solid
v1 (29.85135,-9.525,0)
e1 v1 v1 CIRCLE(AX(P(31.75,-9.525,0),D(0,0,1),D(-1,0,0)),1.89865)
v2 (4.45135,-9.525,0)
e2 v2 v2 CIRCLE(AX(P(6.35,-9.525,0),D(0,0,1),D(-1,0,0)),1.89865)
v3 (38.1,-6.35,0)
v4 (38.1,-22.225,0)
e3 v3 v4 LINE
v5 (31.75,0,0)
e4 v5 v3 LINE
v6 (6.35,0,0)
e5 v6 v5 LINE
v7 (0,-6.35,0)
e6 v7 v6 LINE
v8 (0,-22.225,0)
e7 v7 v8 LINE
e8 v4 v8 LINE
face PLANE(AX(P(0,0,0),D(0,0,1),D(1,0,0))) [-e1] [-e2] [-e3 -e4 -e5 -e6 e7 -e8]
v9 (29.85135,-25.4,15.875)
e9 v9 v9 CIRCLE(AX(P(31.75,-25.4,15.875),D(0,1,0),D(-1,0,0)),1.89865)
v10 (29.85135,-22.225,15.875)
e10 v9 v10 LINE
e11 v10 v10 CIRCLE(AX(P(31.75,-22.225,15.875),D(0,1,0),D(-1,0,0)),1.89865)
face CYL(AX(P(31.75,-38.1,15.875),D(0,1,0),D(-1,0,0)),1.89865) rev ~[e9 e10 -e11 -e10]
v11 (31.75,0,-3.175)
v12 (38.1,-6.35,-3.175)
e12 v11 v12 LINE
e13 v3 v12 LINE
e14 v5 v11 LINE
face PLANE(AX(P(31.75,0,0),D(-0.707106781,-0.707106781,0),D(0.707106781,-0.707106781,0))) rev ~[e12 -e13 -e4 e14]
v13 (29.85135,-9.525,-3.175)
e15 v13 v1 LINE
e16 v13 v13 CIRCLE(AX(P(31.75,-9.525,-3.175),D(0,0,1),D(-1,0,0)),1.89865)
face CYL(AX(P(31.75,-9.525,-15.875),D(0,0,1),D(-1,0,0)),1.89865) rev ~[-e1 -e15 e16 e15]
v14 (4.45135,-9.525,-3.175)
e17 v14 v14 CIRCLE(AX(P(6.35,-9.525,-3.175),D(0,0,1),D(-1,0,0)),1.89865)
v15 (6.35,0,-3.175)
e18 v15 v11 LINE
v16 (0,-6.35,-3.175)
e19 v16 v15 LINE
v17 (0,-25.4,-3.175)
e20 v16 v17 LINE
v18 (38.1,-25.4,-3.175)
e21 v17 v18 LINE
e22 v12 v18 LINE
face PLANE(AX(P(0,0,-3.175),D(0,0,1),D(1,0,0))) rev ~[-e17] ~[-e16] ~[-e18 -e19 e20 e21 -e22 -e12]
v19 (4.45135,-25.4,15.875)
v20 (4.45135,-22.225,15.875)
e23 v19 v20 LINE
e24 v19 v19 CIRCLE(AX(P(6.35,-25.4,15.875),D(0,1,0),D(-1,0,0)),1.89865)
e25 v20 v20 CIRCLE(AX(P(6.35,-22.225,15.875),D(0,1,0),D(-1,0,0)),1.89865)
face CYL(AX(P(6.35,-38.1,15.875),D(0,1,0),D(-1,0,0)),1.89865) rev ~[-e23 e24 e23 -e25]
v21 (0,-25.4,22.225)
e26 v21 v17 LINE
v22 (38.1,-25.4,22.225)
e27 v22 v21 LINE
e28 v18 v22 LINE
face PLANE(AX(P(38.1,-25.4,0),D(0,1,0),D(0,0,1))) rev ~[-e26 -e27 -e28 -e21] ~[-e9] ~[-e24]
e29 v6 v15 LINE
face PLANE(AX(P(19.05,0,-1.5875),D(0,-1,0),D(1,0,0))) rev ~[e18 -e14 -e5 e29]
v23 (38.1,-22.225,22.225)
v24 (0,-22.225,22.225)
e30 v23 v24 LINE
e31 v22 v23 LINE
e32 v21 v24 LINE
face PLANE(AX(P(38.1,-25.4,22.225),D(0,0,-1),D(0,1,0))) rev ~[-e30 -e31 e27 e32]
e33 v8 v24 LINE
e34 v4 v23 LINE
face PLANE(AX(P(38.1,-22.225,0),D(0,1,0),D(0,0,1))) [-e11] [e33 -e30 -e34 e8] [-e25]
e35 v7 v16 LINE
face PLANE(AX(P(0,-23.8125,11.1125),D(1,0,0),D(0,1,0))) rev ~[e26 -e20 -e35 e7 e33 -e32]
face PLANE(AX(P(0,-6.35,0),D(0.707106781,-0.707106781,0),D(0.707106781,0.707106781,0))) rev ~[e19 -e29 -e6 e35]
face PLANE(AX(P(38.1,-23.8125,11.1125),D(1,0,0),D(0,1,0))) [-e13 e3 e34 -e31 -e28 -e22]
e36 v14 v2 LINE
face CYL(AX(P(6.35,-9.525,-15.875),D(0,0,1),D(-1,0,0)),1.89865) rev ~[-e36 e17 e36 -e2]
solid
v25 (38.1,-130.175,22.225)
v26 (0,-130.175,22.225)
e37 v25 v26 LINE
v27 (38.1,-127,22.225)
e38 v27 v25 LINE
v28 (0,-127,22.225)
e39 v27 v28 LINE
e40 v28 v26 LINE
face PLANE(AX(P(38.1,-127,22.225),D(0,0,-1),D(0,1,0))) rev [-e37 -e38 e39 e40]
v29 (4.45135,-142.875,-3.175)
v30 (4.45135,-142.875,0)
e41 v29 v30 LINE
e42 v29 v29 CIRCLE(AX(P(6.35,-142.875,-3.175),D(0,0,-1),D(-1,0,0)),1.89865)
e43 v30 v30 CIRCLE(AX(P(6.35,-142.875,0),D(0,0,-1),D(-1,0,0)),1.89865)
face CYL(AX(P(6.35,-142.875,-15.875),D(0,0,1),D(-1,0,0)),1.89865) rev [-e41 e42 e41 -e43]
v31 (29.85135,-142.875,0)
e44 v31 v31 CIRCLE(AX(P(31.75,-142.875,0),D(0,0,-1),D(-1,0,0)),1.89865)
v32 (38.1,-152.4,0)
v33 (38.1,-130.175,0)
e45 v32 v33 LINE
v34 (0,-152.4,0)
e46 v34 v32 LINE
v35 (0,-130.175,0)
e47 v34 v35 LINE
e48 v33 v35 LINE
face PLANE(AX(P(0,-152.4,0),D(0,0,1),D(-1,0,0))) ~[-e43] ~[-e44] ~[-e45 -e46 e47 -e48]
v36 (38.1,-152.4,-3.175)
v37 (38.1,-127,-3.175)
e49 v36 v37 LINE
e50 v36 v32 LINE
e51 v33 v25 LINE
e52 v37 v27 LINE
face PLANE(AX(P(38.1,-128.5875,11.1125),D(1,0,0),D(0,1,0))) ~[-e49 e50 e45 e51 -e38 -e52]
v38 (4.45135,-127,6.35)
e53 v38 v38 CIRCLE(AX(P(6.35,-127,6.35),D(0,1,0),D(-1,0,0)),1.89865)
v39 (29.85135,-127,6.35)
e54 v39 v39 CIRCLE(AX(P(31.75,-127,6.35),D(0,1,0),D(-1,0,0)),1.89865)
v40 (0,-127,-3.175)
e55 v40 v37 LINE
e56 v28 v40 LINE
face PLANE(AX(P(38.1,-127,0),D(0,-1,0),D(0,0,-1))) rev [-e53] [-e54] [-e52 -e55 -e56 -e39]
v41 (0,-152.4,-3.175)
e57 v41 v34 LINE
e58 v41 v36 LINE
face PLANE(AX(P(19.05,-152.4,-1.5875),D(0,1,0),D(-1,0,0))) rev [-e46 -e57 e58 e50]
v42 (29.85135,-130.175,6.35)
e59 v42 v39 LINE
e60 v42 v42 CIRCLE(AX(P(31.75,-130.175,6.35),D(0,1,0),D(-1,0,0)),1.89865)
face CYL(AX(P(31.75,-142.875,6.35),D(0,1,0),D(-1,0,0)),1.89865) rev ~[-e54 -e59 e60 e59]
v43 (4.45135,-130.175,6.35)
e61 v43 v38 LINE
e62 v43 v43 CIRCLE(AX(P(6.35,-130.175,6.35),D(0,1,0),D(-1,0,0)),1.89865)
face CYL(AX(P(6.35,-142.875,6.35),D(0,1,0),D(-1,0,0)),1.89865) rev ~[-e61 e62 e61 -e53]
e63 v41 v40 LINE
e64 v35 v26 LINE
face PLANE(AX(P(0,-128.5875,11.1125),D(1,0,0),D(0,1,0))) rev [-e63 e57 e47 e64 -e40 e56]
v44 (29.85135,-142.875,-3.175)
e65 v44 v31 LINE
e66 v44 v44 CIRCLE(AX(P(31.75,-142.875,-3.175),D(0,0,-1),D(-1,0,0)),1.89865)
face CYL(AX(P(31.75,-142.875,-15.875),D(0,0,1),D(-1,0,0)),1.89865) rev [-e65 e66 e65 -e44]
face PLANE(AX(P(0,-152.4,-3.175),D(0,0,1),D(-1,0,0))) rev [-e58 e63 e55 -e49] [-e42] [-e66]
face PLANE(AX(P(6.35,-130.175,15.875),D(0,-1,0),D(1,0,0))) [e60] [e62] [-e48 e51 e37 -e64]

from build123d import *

# Parameters (mm, degrees)
F0_W      = 38.1
F0_H      = 3.175
F1_DEPTH  = 25.4
F2_W      = 3.175
F2_H      = 22.225
F3_DEPTH  = 38.1
F5_D      = 3.7973
F5_DEPTH  = 12.7
F5_TIP    = 1.1408240143
F7_D      = 3.7973
F7_DEPTH  = 12.7
F7_TIP    = 1.1408240143
F10_R     = 3.3782
F10_R_2   = 1.89865
F11_DEPTH = 3.175
F14_D     = 3.7973
F14_DEPTH = 12.7
F14_TIP   = 1.1408240143
F15_R     = 1.89865
F16_DEPTH = 3.175
F18_DEPTH = 25.4


with BuildPart() as f1:
    # F0 (on Front) → F1 (new body)
    with BuildSketch(Plane.XZ):
        with Locations((19.05, -1.5875)):
            Rectangle(F0_W, F0_H)
    extrude(amount=F1_DEPTH)

    # F2 (on face) → F3 (join)
    with BuildSketch(Plane.YZ.offset(38.1)):
        with Locations((-23.8125, 11.1125)):
            Rectangle(F2_W, F2_H)
    extrude(amount=-F3_DEPTH)

    # F5
    with Locations(Plane.XZ.offset(25.4)):
        with Locations((6.35, 15.875), (31.75, 15.875)):
            Hole(F5_D / 2, depth=F5_DEPTH)
            with Locations((0, 0, -(F5_DEPTH + F5_TIP / 2))):  # 118° drill point
                Cone(0, F5_D / 2, F5_TIP, mode=Mode.SUBTRACT)

    # F7
    with Locations(Plane(origin=(0, 0, -3.175), x_dir=(1, 0, 0), z_dir=(0, 0, -1))):
        with Locations((6.35, 9.525), (31.75, 9.525)):
            Hole(F7_D / 2, depth=F7_DEPTH)
            with Locations((0, 0, -(F7_DEPTH + F7_TIP / 2))):  # 118° drill point
                Cone(0, F7_D / 2, F7_TIP, mode=Mode.SUBTRACT)


with BuildPart() as f9_1:
    # F9: instance of F1
    add(f1.part.mirror(Plane(origin=(19.05, -76.2, 9.3728155466), x_dir=(1, 0, 0), z_dir=(0, -1, 0))))


with BuildPart() as f11:
    # F10 (on face) → F11 (new body)
    with BuildSketch(Plane.XZ.offset(130.175)):
        with Locations((6.35, 15.875)):
            Circle(F10_R)
        with Locations((6.35, 15.875)):
            Circle(F10_R_2, mode=Mode.SUBTRACT)
    extrude(amount=-F11_DEPTH)

    # F12: union F9_1
    add(f9_1.part)

    # F14
    with Locations(Plane.XZ.offset(130.175)):
        with Locations((31.75, 6.35), (6.35, 6.35)):
            Hole(F14_D / 2, depth=F14_DEPTH)
            with Locations((0, 0, -(F14_DEPTH + F14_TIP / 2))):  # 118° drill point
                Cone(0, F14_D / 2, F14_TIP, mode=Mode.SUBTRACT)

    # F15 (on face) → F16 (join)
    with BuildSketch(Plane.XZ.offset(130.175)):
        with Locations((6.35, 15.875)):
            Circle(F15_R)
        with Locations((31.75, 15.875)):
            Circle(F15_R)
    extrude(amount=-F16_DEPTH)


with BuildPart() as f1_1:
    add(f1.part)

    # F17 (on face) → F18 (cut)
    with BuildSketch(Plane.XY):
        Polygon((6.35, 0), (0, 0), (0, -6.35), align=None)
        Polygon((38.1, 0), (31.75, 0), (38.1, -6.35), align=None)
    extrude(amount=-F18_DEPTH, mode=Mode.SUBTRACT)


solid = Compound([f11.part, f1_1.part])
